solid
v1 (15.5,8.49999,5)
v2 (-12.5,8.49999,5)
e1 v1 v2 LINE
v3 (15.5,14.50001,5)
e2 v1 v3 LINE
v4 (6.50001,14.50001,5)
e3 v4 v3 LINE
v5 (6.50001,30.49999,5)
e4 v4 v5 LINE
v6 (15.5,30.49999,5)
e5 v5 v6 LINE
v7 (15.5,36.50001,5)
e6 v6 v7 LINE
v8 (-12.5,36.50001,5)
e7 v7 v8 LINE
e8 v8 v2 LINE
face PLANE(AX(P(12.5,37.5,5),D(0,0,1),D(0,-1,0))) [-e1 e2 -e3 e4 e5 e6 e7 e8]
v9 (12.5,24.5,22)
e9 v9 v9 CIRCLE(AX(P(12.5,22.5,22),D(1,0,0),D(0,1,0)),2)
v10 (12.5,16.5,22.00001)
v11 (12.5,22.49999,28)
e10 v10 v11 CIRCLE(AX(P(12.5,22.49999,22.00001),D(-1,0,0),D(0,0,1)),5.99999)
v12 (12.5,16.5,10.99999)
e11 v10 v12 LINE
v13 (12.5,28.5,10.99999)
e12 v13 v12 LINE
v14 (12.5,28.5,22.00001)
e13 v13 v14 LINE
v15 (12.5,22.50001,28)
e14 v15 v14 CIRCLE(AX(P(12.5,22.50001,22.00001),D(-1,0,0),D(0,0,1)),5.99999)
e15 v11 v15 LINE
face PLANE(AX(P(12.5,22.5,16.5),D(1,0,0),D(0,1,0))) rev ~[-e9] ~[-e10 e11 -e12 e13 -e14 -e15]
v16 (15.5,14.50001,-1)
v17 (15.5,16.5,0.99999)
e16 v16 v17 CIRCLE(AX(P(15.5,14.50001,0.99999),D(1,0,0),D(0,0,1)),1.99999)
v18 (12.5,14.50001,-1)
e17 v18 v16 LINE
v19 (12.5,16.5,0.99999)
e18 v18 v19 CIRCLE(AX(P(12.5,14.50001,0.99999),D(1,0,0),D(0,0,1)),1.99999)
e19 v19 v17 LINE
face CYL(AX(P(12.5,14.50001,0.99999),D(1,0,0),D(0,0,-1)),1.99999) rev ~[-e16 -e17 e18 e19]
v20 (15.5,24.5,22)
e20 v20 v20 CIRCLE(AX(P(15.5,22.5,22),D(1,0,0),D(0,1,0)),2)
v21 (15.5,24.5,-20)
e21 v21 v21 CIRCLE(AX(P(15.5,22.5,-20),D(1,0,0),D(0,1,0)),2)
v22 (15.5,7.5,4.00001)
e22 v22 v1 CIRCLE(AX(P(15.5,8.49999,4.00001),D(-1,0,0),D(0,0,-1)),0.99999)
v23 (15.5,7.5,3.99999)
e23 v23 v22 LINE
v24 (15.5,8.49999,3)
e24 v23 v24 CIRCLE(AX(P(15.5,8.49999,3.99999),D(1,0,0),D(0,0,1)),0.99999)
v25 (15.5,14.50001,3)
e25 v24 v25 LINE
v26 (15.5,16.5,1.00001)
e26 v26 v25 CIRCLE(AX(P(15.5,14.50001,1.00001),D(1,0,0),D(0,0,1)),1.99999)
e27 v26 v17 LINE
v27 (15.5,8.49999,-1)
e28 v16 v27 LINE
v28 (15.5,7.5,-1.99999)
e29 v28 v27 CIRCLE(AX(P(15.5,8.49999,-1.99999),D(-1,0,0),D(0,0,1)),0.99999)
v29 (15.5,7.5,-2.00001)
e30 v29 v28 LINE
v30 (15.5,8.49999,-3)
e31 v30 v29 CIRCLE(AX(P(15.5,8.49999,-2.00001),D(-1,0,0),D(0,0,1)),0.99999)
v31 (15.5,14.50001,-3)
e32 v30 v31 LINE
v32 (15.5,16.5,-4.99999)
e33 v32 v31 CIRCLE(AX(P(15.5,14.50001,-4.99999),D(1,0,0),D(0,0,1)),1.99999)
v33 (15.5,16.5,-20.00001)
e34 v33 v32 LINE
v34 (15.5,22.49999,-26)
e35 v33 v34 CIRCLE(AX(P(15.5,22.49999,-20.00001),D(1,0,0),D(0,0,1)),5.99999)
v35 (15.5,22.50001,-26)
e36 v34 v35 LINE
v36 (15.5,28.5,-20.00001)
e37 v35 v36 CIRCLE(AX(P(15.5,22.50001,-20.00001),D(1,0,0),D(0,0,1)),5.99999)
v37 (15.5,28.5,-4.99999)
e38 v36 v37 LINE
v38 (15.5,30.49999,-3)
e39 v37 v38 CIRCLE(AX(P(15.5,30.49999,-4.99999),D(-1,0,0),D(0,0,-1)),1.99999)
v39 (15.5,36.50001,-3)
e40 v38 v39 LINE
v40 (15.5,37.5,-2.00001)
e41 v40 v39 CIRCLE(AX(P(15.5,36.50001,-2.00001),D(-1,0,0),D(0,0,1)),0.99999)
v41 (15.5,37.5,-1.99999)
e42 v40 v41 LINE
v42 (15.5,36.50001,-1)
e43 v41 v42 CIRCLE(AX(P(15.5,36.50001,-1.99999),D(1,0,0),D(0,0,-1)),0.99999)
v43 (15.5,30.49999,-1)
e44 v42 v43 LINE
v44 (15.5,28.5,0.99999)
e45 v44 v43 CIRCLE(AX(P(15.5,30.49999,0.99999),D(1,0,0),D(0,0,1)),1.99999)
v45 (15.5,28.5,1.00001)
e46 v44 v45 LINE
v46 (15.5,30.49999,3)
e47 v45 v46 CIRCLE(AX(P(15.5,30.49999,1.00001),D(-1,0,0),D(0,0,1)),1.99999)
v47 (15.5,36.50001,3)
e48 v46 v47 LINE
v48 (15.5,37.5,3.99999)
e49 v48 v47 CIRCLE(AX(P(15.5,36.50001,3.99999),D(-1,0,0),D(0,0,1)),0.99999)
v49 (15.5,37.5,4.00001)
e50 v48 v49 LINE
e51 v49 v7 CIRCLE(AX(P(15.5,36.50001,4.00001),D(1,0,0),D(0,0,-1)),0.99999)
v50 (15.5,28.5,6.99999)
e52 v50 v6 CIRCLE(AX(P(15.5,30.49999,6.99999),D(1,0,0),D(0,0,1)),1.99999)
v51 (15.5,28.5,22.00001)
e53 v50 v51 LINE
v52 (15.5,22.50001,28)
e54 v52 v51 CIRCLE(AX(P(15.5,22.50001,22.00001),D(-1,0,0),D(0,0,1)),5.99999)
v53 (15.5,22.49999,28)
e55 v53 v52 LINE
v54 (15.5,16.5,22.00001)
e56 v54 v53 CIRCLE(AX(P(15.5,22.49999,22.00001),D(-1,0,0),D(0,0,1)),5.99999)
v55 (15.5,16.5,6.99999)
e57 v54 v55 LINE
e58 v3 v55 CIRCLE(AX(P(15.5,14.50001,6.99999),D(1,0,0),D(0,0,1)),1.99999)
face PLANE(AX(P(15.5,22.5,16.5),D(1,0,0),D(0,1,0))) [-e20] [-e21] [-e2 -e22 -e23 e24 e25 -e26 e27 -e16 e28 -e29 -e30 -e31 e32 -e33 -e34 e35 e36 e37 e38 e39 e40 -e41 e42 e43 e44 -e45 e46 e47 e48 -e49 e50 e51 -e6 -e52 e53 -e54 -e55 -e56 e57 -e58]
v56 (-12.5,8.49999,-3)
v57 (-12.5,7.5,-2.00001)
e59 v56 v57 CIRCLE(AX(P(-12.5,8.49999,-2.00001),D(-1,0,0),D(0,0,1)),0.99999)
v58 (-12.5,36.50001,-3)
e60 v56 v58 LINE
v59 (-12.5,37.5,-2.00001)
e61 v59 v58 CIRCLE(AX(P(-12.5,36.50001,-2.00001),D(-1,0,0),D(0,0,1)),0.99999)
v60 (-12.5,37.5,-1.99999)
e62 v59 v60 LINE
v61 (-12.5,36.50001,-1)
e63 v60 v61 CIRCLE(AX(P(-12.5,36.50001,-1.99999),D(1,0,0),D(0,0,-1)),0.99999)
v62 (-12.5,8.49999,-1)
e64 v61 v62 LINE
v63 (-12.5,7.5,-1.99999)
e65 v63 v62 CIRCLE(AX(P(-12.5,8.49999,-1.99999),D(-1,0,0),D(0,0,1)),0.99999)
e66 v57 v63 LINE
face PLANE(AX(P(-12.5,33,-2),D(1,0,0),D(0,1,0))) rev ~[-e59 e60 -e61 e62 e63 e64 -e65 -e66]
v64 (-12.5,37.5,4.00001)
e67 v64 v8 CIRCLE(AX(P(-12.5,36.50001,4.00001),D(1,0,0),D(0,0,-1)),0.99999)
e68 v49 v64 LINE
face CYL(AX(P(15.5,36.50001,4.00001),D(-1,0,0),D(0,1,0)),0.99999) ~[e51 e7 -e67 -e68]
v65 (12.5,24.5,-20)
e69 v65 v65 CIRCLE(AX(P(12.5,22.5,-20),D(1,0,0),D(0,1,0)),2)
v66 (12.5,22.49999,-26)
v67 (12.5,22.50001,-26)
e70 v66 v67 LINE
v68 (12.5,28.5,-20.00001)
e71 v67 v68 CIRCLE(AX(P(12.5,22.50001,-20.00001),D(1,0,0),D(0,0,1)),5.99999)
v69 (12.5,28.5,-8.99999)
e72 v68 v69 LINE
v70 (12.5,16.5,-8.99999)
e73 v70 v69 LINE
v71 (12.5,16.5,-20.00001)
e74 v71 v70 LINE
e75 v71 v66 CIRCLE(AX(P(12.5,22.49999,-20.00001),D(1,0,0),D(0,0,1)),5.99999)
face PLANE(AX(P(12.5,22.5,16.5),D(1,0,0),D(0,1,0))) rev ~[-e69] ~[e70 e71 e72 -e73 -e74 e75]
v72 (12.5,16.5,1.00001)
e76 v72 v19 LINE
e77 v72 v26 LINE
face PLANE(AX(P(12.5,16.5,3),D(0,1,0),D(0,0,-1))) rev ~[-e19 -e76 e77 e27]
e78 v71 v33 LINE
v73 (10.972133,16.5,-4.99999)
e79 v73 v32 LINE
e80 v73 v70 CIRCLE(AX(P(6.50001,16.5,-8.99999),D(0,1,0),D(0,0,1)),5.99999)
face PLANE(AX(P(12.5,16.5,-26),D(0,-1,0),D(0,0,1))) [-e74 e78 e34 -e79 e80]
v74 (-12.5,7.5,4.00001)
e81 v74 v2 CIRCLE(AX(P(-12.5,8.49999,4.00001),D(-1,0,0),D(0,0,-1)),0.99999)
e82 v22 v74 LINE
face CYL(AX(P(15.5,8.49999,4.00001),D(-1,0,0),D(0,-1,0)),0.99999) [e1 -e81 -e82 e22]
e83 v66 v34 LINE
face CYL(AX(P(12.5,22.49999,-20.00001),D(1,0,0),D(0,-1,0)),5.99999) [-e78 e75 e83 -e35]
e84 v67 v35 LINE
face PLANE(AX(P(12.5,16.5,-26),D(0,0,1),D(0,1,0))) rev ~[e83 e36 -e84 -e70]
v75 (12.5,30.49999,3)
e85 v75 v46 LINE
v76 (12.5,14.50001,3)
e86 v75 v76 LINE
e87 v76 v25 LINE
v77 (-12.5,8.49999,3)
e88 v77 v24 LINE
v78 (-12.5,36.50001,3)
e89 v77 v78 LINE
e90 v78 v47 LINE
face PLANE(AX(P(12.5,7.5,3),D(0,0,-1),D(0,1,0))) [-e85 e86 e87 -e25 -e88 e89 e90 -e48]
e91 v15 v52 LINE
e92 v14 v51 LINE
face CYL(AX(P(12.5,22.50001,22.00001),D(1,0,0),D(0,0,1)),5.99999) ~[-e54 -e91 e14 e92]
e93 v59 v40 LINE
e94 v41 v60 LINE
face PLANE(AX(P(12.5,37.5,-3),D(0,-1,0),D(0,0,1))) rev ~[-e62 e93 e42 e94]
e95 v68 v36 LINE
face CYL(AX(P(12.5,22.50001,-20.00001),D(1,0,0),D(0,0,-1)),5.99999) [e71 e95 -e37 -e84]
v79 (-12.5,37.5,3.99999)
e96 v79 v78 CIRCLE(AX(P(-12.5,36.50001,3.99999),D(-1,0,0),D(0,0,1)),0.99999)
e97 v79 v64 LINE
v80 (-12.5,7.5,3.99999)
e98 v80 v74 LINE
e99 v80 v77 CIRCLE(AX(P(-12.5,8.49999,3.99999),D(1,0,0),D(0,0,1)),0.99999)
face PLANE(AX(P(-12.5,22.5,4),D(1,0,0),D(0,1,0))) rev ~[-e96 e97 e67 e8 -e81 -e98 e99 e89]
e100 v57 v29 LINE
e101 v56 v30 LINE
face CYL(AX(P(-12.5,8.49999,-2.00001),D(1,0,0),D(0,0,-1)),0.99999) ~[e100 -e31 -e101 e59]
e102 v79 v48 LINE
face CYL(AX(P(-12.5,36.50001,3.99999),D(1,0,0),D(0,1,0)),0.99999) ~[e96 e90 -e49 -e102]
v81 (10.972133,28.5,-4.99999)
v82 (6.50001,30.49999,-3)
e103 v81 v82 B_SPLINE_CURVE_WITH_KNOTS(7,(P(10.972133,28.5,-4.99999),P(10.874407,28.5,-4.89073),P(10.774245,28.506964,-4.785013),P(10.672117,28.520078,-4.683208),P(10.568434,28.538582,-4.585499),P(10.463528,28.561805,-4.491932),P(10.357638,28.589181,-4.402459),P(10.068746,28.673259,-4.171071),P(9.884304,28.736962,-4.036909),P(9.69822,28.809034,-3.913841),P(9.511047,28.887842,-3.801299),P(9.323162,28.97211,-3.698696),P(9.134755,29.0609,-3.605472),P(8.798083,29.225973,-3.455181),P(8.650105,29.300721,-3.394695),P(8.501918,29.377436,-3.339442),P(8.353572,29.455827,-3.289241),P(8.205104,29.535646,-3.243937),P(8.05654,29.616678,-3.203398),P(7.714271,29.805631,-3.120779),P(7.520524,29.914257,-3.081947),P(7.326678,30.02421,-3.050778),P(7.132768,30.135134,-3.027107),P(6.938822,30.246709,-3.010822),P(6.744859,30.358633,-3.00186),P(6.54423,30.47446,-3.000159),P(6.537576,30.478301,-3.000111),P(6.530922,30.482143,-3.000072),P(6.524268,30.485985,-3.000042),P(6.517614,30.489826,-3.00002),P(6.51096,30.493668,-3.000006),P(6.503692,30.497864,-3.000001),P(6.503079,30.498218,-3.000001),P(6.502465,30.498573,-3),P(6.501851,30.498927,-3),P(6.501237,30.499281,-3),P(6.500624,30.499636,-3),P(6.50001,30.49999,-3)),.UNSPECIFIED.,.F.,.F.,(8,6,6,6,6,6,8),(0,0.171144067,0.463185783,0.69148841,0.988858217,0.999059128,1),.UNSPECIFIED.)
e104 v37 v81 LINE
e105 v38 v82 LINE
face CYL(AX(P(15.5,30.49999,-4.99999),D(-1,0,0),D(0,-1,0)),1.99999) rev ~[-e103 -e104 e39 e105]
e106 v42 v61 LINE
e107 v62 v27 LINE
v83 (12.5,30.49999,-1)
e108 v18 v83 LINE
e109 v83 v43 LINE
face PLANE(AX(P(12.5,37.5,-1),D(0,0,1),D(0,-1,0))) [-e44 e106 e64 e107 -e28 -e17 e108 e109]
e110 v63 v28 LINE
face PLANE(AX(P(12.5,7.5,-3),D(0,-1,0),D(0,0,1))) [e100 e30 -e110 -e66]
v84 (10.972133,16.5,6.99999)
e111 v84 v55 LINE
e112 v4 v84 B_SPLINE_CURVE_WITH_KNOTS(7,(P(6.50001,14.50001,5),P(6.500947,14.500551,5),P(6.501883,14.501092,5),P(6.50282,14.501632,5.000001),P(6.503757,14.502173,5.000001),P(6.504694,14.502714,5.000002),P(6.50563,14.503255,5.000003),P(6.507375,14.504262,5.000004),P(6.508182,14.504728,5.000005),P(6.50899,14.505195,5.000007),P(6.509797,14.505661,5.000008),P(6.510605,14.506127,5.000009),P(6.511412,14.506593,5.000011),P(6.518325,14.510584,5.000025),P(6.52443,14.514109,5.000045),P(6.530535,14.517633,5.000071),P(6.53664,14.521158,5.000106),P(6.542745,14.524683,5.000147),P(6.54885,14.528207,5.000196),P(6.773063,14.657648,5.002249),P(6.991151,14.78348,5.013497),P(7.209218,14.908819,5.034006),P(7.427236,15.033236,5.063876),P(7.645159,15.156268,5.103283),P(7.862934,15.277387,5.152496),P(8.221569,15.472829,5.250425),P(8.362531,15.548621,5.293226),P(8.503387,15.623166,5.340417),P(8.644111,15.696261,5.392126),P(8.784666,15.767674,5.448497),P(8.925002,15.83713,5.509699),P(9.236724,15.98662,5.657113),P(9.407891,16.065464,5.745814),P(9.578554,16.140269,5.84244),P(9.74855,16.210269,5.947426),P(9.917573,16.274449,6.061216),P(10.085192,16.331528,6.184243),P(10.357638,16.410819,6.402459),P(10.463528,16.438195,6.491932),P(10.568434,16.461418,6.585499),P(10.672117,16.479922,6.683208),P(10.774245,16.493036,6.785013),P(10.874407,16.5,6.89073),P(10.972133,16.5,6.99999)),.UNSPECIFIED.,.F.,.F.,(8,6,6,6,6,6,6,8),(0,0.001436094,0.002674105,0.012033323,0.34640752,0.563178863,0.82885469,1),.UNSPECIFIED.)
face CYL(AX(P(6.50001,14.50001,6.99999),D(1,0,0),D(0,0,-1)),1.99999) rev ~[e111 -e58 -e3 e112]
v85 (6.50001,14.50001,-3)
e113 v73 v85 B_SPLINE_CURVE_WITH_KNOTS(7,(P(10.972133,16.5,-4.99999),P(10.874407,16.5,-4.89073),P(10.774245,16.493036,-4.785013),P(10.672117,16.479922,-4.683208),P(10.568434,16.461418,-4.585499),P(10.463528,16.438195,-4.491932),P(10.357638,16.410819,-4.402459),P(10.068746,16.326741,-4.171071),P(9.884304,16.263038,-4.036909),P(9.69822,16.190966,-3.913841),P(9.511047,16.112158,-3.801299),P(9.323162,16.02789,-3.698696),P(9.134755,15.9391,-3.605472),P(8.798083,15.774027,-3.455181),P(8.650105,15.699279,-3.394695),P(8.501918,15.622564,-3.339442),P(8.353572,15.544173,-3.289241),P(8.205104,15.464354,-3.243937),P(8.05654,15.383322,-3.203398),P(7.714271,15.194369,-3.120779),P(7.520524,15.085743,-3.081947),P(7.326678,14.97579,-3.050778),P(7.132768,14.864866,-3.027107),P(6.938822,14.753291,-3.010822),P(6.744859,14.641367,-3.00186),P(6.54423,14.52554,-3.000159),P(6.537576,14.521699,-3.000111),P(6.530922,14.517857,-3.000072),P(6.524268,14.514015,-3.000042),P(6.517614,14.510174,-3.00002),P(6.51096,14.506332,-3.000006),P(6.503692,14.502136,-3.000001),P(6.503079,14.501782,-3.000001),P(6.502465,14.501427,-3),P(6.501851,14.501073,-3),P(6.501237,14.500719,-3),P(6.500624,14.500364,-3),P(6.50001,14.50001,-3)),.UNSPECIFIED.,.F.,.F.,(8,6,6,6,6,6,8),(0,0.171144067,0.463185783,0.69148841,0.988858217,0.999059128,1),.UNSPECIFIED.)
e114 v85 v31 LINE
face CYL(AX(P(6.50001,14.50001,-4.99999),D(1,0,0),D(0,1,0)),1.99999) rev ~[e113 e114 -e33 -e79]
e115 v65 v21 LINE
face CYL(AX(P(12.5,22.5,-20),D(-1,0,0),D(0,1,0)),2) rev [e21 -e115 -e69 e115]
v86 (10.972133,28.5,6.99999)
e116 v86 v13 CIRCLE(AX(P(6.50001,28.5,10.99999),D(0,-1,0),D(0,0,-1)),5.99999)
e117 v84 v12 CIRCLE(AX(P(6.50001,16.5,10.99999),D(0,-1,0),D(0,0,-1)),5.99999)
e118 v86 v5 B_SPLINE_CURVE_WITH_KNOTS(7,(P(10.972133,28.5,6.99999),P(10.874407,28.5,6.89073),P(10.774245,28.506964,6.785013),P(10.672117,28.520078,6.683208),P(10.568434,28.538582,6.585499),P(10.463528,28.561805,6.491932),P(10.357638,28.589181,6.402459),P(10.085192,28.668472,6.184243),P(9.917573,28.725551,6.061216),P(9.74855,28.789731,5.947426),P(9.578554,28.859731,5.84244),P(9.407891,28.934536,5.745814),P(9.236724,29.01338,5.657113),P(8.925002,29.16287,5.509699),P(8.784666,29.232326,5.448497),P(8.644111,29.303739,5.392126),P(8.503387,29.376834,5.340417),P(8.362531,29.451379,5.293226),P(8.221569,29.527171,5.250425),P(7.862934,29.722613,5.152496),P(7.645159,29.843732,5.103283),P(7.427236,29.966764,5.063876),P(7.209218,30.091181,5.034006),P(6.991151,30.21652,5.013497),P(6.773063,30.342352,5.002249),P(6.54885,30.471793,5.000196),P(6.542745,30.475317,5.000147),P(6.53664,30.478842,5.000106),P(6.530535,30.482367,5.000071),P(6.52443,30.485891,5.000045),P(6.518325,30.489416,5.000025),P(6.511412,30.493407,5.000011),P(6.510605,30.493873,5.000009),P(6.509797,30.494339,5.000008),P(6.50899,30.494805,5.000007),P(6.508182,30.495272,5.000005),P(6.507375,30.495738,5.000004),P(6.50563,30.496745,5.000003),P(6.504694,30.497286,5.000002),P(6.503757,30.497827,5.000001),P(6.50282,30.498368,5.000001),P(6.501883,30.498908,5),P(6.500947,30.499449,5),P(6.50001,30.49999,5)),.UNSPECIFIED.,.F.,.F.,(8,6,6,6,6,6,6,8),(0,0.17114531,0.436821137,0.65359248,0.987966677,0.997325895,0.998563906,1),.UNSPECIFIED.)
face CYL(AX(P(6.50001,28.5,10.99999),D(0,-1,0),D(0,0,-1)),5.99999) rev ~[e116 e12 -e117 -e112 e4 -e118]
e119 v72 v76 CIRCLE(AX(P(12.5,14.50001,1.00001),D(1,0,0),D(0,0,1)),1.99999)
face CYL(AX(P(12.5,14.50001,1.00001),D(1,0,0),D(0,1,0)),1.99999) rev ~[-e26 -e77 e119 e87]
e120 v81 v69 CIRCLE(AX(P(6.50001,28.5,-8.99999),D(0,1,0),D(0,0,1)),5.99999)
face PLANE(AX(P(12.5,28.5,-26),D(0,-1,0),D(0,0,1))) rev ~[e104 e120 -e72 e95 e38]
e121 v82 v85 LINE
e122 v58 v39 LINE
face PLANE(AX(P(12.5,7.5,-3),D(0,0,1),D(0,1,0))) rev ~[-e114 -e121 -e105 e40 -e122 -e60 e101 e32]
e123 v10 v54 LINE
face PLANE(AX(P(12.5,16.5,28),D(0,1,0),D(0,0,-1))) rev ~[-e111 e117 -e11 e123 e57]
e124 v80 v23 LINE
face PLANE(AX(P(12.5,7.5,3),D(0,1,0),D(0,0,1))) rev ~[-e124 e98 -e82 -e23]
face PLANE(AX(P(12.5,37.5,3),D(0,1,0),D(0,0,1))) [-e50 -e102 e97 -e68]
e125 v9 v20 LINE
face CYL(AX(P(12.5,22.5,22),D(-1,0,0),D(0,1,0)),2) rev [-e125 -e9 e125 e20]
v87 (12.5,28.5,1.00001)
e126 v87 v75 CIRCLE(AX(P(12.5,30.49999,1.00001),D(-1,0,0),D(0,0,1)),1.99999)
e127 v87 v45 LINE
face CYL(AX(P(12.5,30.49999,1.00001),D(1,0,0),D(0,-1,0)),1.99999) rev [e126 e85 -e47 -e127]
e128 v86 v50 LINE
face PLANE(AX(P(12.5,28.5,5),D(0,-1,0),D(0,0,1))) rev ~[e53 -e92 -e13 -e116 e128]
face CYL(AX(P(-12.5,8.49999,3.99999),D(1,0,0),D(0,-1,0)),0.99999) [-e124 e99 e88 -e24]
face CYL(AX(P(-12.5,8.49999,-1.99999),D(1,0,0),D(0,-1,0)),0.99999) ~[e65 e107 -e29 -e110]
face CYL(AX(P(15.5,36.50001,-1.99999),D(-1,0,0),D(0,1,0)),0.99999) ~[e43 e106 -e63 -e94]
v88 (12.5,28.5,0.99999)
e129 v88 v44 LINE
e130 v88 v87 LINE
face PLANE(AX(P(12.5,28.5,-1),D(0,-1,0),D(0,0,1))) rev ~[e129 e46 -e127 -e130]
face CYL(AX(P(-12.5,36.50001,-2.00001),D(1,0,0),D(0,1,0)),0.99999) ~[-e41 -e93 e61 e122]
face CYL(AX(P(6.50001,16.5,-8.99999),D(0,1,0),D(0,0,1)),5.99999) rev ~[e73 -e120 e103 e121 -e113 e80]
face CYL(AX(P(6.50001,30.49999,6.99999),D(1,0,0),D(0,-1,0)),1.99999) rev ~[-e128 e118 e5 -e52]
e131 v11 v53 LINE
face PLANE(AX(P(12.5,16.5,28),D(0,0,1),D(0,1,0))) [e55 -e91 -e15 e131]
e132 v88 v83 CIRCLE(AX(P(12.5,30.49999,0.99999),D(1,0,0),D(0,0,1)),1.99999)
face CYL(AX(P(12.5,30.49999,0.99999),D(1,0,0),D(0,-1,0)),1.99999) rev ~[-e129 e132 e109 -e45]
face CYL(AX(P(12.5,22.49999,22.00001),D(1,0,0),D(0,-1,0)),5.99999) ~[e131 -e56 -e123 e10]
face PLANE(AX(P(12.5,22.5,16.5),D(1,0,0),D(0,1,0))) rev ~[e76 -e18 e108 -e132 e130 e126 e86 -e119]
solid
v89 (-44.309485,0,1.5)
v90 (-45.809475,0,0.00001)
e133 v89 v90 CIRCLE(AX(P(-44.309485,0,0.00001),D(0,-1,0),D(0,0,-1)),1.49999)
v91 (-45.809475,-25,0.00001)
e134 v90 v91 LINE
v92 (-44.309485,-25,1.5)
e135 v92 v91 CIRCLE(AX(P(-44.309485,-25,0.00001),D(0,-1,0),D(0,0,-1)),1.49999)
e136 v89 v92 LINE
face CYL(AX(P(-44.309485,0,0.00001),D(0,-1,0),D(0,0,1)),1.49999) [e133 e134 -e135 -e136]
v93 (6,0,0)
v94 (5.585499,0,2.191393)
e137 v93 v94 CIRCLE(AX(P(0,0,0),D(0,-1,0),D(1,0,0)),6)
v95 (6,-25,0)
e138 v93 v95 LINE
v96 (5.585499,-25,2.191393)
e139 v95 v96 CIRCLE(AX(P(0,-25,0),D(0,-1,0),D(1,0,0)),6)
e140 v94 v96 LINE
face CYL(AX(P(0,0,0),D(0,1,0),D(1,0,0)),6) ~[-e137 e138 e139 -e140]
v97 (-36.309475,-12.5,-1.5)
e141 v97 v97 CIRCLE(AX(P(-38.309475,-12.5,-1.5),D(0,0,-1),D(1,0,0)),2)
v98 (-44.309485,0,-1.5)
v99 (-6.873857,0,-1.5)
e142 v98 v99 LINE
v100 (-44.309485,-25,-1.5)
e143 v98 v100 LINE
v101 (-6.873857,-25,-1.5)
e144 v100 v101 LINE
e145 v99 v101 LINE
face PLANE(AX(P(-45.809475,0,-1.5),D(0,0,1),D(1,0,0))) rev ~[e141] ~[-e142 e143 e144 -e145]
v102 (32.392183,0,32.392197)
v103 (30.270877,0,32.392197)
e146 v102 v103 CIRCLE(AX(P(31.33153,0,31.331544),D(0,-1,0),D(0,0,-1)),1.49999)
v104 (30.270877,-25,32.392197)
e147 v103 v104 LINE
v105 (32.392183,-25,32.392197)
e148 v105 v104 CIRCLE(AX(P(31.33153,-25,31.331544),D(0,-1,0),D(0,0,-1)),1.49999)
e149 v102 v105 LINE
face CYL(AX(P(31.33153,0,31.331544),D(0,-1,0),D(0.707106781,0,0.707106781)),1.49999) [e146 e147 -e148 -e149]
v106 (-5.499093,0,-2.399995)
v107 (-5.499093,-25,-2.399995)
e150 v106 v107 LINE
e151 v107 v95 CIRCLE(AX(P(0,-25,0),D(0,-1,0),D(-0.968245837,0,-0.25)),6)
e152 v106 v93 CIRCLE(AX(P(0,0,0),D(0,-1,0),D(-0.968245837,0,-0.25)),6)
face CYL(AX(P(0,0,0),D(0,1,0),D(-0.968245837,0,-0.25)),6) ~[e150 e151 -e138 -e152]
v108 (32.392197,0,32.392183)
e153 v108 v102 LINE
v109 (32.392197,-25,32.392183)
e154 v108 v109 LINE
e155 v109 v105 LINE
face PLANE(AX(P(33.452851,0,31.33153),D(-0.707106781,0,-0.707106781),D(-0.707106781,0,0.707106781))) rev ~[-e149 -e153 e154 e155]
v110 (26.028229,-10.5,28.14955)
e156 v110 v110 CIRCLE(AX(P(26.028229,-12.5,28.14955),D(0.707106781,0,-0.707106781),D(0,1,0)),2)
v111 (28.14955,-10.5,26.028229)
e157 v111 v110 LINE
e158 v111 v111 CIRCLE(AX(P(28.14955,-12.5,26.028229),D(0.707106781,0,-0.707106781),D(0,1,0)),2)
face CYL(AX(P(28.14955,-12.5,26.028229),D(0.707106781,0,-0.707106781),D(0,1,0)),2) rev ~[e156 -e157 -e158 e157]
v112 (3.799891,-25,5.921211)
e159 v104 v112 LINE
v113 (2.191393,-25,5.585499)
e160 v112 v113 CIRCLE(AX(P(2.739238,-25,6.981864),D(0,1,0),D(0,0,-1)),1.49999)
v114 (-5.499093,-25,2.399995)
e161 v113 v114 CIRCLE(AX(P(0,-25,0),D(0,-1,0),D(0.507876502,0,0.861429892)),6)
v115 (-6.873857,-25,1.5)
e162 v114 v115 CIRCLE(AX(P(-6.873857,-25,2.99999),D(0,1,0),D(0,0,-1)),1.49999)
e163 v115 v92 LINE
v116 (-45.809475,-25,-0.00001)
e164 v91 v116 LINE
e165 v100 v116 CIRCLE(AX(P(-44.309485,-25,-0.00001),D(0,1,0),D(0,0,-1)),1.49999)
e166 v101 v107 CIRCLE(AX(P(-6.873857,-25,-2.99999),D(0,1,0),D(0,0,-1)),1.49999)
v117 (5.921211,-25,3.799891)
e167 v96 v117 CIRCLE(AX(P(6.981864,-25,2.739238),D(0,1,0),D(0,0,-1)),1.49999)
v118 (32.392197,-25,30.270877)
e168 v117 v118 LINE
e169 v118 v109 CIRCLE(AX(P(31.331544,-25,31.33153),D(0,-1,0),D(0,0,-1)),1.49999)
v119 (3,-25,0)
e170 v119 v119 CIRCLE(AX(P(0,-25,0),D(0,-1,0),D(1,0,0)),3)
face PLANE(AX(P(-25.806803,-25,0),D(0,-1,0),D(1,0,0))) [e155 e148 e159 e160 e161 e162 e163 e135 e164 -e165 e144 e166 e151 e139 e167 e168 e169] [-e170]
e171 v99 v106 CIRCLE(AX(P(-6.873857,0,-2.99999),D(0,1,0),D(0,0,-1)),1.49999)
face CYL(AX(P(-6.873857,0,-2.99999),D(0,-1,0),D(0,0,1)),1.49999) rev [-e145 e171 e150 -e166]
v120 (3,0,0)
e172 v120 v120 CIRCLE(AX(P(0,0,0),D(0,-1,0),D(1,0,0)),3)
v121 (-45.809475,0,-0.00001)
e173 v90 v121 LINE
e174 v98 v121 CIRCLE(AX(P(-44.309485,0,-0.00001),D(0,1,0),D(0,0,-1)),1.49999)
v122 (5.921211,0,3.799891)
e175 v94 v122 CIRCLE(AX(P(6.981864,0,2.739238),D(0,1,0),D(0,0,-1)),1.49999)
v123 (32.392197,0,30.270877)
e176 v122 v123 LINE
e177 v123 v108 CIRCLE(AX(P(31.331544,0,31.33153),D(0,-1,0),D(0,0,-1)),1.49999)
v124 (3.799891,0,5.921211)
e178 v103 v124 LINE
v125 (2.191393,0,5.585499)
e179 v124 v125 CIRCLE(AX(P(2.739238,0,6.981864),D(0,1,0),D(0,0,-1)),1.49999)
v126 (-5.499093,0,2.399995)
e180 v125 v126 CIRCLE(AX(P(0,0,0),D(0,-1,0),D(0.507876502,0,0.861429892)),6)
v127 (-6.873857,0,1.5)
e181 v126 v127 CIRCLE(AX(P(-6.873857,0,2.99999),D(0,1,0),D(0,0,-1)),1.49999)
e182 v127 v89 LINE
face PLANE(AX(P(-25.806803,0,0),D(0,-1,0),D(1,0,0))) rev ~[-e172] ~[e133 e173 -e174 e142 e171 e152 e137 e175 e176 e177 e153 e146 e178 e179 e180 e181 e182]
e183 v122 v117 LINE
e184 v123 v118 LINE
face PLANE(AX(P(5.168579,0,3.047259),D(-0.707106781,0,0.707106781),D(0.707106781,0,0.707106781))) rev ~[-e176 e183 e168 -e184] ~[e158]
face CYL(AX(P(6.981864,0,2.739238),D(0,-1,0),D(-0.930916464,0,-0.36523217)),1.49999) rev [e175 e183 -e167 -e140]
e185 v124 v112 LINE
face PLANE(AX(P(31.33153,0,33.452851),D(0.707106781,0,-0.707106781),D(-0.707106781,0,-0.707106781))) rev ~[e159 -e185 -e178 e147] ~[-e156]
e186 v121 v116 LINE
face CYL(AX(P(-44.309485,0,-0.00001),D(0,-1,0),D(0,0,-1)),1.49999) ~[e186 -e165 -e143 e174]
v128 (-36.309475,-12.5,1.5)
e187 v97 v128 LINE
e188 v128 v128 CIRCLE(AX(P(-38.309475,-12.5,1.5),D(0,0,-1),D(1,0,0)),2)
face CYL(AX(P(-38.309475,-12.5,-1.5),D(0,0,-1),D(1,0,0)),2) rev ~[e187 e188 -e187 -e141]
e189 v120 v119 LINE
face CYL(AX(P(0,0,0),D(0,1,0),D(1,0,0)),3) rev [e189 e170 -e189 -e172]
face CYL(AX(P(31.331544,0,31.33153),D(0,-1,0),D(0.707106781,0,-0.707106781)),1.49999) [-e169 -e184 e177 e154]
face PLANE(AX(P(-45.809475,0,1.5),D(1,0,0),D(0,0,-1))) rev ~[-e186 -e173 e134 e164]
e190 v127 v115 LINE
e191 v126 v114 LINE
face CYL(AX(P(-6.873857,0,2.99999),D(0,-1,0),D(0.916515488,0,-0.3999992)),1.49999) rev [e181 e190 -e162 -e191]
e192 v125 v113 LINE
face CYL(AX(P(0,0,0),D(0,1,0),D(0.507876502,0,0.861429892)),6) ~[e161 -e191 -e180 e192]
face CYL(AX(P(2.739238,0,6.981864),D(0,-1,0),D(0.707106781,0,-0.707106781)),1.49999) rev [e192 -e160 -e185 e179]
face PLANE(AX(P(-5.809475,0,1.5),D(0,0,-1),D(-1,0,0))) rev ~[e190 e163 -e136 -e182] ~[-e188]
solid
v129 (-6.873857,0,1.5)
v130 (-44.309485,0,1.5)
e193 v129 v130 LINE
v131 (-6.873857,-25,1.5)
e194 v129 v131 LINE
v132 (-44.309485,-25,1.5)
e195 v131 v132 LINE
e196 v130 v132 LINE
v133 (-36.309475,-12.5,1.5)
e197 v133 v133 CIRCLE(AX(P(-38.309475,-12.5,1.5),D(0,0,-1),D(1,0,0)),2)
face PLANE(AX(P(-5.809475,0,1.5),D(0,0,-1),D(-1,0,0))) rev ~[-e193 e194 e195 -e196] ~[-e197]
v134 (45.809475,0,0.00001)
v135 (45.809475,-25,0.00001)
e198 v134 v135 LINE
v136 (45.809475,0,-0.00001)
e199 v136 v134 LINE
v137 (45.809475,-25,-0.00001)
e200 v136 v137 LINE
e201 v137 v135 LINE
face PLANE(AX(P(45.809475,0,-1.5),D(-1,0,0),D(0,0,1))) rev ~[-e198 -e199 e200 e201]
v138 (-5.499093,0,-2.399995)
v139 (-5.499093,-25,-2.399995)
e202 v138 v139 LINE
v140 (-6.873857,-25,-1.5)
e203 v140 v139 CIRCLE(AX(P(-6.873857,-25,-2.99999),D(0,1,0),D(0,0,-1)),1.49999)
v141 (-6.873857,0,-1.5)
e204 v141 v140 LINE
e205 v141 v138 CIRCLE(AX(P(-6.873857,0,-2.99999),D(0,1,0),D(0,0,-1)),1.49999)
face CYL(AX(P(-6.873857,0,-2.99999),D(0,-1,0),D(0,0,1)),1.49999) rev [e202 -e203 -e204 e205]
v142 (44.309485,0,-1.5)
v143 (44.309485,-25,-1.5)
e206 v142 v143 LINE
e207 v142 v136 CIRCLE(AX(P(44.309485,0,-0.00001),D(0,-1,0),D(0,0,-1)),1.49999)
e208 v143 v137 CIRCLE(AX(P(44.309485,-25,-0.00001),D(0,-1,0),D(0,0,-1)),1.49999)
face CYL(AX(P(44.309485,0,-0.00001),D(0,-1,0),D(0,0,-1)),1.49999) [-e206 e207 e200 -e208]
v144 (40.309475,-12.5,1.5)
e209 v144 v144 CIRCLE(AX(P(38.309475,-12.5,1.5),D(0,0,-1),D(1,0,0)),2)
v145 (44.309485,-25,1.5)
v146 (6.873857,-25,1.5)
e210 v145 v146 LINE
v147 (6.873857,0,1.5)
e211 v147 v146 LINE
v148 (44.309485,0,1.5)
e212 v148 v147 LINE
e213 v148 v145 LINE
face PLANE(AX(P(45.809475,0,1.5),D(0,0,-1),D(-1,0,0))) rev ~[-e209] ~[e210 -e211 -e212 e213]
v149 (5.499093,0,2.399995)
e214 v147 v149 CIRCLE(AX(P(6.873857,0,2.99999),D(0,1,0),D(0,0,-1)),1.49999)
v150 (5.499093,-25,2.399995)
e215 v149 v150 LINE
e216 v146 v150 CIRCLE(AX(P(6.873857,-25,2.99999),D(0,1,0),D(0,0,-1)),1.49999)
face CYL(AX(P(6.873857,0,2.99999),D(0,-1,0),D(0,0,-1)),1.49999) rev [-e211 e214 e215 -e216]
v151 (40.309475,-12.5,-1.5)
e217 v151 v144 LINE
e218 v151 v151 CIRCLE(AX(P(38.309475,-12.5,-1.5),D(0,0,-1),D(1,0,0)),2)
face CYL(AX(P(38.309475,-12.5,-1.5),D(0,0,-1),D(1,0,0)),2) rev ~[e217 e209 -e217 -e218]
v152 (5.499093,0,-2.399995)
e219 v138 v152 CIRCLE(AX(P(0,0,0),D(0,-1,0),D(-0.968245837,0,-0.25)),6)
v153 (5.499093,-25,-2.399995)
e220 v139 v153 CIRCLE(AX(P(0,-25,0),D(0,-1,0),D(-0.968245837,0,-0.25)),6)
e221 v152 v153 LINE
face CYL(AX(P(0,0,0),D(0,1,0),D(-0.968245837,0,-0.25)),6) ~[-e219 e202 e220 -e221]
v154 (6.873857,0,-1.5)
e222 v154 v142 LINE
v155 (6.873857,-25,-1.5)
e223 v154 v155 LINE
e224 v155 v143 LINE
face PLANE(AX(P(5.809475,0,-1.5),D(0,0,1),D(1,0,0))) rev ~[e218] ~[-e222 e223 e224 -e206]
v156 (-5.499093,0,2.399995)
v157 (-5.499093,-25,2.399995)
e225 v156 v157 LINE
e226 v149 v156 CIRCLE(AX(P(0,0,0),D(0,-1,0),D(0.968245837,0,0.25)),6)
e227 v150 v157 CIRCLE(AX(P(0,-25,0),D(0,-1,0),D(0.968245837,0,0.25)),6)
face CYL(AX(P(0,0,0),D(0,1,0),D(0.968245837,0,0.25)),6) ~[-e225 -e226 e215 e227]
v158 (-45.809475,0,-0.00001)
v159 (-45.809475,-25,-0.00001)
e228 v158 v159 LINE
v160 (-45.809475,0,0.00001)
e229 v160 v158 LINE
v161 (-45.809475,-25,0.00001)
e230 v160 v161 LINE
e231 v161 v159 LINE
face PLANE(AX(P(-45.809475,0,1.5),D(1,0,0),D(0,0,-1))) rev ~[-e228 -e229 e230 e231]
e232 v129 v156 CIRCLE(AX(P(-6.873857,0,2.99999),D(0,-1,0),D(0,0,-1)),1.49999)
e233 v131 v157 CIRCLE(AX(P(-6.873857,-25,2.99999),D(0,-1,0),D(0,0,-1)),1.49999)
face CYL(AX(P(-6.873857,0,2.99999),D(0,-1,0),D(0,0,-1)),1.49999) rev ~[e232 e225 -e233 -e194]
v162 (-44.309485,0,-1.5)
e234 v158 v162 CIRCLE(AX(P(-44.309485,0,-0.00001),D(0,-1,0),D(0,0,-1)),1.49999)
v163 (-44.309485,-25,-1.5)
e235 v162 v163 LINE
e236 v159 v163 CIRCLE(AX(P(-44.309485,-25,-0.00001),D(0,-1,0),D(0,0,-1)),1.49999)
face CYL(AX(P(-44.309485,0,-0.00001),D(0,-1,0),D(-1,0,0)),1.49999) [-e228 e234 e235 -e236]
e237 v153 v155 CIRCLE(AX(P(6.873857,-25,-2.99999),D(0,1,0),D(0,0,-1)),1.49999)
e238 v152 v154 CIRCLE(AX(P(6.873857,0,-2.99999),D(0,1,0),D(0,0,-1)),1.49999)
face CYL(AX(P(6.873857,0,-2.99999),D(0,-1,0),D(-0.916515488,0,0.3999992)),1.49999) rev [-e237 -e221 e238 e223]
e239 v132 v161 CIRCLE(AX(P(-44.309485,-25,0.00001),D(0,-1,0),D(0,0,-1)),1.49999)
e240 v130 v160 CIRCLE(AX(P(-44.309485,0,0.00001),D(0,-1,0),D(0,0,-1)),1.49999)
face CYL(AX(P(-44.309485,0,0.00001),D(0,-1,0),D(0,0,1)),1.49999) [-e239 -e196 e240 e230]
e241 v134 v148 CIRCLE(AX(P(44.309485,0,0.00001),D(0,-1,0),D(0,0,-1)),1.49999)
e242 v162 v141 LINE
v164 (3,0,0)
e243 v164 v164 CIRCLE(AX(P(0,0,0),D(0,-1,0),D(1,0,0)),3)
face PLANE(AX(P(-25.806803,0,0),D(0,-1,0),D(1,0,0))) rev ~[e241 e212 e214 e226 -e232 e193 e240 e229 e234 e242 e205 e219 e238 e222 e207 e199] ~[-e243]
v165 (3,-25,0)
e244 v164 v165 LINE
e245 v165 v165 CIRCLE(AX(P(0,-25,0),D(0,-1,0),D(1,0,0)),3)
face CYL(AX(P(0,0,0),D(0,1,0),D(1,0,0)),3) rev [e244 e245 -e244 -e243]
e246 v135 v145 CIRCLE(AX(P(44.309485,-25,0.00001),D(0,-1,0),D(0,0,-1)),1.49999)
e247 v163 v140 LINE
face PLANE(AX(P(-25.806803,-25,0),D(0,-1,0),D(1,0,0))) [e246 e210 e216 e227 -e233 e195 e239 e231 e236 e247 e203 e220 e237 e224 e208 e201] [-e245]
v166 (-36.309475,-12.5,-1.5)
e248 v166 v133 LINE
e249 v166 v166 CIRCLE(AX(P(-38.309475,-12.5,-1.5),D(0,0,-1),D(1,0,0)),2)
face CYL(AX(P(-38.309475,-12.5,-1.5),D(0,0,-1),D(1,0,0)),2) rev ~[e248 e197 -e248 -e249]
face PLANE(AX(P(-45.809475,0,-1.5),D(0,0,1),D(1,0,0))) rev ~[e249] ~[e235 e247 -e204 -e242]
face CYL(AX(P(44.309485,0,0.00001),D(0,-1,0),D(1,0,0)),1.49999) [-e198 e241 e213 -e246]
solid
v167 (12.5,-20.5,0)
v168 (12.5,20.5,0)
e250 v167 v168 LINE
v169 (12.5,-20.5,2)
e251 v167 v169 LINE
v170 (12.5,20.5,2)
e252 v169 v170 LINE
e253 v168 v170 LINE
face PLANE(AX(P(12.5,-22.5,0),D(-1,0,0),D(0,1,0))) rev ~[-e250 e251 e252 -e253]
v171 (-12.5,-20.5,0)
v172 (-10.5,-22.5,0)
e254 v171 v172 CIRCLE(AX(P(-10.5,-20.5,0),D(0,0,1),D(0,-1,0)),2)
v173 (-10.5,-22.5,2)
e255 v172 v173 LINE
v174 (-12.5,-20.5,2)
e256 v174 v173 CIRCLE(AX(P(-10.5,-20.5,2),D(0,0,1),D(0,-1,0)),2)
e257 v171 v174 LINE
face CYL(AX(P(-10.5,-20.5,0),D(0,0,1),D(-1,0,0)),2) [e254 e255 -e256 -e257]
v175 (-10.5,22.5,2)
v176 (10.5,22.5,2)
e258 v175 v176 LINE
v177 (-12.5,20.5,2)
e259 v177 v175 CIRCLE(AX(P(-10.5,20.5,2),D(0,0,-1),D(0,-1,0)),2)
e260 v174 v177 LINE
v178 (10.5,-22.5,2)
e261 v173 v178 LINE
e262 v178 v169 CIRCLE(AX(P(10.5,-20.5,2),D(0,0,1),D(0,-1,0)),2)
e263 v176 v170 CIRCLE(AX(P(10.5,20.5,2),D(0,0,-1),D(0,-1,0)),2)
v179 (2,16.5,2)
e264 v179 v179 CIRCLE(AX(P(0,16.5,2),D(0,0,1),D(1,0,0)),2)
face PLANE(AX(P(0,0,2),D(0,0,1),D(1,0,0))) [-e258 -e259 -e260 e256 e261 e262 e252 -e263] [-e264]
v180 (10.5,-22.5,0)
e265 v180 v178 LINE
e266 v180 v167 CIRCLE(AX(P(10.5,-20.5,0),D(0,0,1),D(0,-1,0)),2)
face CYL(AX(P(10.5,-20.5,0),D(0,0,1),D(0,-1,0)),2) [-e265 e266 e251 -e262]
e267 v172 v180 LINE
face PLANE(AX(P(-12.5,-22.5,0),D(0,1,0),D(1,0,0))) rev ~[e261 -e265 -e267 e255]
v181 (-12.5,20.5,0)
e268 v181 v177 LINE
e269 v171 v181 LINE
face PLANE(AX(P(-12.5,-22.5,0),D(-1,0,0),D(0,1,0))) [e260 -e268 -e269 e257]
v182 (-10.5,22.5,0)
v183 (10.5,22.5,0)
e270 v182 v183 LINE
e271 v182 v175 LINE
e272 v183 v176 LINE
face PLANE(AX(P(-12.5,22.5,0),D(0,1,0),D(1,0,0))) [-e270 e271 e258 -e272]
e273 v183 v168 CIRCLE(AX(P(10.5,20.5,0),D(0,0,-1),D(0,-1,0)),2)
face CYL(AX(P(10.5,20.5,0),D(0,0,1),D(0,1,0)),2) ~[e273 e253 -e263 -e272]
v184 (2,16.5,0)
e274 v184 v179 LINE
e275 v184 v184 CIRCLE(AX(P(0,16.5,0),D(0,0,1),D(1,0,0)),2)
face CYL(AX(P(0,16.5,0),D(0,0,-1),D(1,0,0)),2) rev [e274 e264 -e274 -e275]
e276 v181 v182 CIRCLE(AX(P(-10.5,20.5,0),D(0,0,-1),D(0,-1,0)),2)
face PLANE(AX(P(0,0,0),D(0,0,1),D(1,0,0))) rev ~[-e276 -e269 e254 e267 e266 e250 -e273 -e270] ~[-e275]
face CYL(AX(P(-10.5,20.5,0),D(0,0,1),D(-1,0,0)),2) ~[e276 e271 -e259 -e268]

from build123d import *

# Parameters (mm, degrees)
F0_R      = 3
F1_DEPTH  = 25
F2_R      = 1.49999
F3_R      = 3
F4_DEPTH  = 25
F5_R      = 1.49999
F7_R      = 2
F8_DEPTH  = 3
F6_R      = 2
F9_R      = 2
F10_DEPTH = 3
F11_W     = 25
F11_H     = 45
F11_R     = 2
F12_DEPTH = 2
F13_W     = 12
F13_H     = 23
F13_R     = 2
F13_W_2   = 9
F13_H_2   = 2
F13_W_3   = 6
F14_DEPTH = 3
F15_DEPTH = 25
F16_R     = 0.99999
F17_R     = 5.99999
F18_R     = 1.99999
F19_R     = 2


# Not quite as in the source:
# - a fillet or chamfer is up to 0.001 mm smaller than in the source, because OpenCascade refuses the exact size


with BuildPart() as f1:
    # F0 (on Front) → F1 (new body)
    with BuildSketch(Plane.XZ):
        with BuildLine():
            ThreePointArc((-5.8094750193, -1.5), (-6, 0), (-5.8094750193, 1.5))
            Line((-5.8094750193, 1.5), (-45.8094750193, 1.5))
            Line((-45.8094750193, 1.5), (-45.8094750193, -1.5))
            Line((-45.8094750193, -1.5), (-5.8094750193, -1.5))
        make_face()
        with BuildLine():
            ThreePointArc((5.8094750193, -1.5), (5.9521781776, -0.7560257549), (6, 0))
            ThreePointArc((6, 0), (5.9521781776, 0.7560257549), (5.8094750193, 1.5))
            ThreePointArc((5.8094750193, 1.5), (0, 6), (-5.8094750193, 1.5))
            ThreePointArc((-5.8094750193, 1.5), (-6, 0), (-5.8094750193, -1.5))
            ThreePointArc((-5.8094750193, -1.5), (0, -6), (5.8094750193, -1.5))
        make_face()
        Circle(F0_R, mode=Mode.SUBTRACT)
        with BuildLine():
            ThreePointArc((5.8094750193, 1.5), (5.9521781776, 0.7560257549), (6, 0))
            ThreePointArc((6, 0), (5.9521781776, -0.7560257549), (5.8094750193, -1.5))
            Line((5.8094750193, -1.5), (45.8094750193, -1.5))
            Line((45.8094750193, -1.5), (45.8094750193, 1.5))
            Line((45.8094750193, 1.5), (5.8094750193, 1.5))
        make_face()
    extrude(amount=F1_DEPTH)

    # F2 (radius 1.5 in the source; OpenCascade refuses exactly that, so slightly less here)
    f2_edges = [f1.edges().sort_by_distance(p)[0] for p in [
        (-45.809475, -12.5, 1.5),
        (-45.809475, -12.5, -1.5),
        (45.809475, -12.5, 1.5),
        (45.809475, -12.5, -1.5),
        (-5.809475, -12.5, 1.5),
        (5.809475, -12.5, 1.5),
        (-5.809475, -12.5, -1.5),
        (5.809475, -12.5, -1.5),
    ]]
    fillet(f2_edges, radius=F2_R)


with BuildPart() as f4:
    # F3 (on Front) → F4 (new body)
    with BuildSketch(Plane.XZ):
        with BuildLine():
            Line((-45.8094750193, -1.5), (-5.8094750193, -1.5))
            ThreePointArc((-5.8094750193, -1.5), (-6, 0), (-5.8094750193, 1.5))
            Line((-5.8094750193, 1.5), (-45.8094750193, 1.5))
            Line((-45.8094750193, 1.5), (-45.8094750193, -1.5))
        make_face()
        with BuildLine():
            ThreePointArc((-5.8094750193, -1.5), (0.7560257549, -5.9521781776), (6, 0))
            ThreePointArc((6, 0), (5.788414123, 1.5793232541), (5.1685793531, 3.0472590095))
            ThreePointArc((5.1685793531, 3.0472590095), (4.2426406871, 4.2426406871), (3.0472590095, 5.1685793531))
            ThreePointArc((3.0472590095, 5.1685793531), (-2.2961005942, 5.5432771951), (-5.8094750193, 1.5))
            ThreePointArc((-5.8094750193, 1.5), (-6, 0), (-5.8094750193, -1.5))
        make_face()
        Circle(F3_R, mode=Mode.SUBTRACT)
        with BuildLine():
            ThreePointArc((3.0472590095, 5.1685793531), (4.2426406871, 4.2426406871), (5.1685793531, 3.0472590095))
            Line((5.1685793531, 3.0472590095), (33.4528506005, 31.331530257))
            Line((33.4528506005, 31.331530257), (31.331530257, 33.4528506005))
            Line((31.331530257, 33.4528506005), (3.0472590095, 5.1685793531))
        make_face()
    extrude(amount=F4_DEPTH)

    # F5 (radius 1.5 in the source; OpenCascade refuses exactly that, so slightly less here)
    f5_edges = [f4.edges().sort_by_distance(p)[0] for p in [
        (-45.809475, -12.5, 1.5),
        (-5.809475, -12.5, 1.5),
        (3.047259, -12.5, 5.168579),
        (31.33153, -12.5, 33.452851),
        (33.452851, -12.5, 31.33153),
        (-45.809475, -12.5, -1.5),
        (-5.809475, -12.5, -1.5),
        (5.168579, -12.5, 3.047259),
    ]]
    fillet(f5_edges, radius=F5_R)

    # F7 (on face) → F8 (cut, through all)
    with BuildSketch(Plane(origin=(1.0606601718, 0, -1.0606601718), x_dir=(0, 1, 0), z_dir=(0.7071067812, 0, -0.7071067812))):
        with Locations((-12.5, 38.3094750193)):
            Circle(F7_R)
    extrude(amount=-F8_DEPTH, mode=Mode.SUBTRACT)


with BuildPart() as f10_tool:
    # F6 (on face) + F9 (on face) → F10 (new body, through all)
    with BuildSketch(Plane(origin=(0, 0, -1.5), x_dir=(1, 0, 0), z_dir=(0, 0, -1))):
        with Locations((-38.3094750193, 12.5)):
            Circle(F6_R)
    with BuildSketch(Plane(origin=(0, 0, -1.5), x_dir=(1, 0, 0), z_dir=(0, 0, -1))):
        with Locations((38.3094750193, 12.5)):
            Circle(F9_R)
    extrude(amount=-F10_DEPTH)


with BuildPart() as f1_1:
    add(f1.part)

    # F10: cut by f10_tool
    add(f10_tool.part, mode=Mode.SUBTRACT)


with BuildPart() as f4_1:
    add(f4.part)

    # F10: cut by f10_tool
    add(f10_tool.part, mode=Mode.SUBTRACT)


with BuildPart() as f12:
    # F11 (on Top) → F12 (new body)
    with BuildSketch(Plane.XY):
        Rectangle(F11_W, F11_H)
        with Locations((0, 16.5)):
            Circle(F11_R, mode=Mode.SUBTRACT)
    extrude(amount=F12_DEPTH)

    # F19
    f19_edges = [f12.edges().sort_by_distance(p)[0] for p in [
        (-12.5, -22.5, 1),
        (12.5, -22.5, 1),
        (12.5, 22.5, 1),
        (-12.5, 22.5, 1),
    ]]
    fillet(f19_edges, radius=F19_R)


with BuildPart() as f14:
    # F13 (on face) → F14 (new body)
    with BuildSketch(Plane.YZ.offset(12.5)):
        with Locations((22.5, 16.5)):
            Rectangle(F13_W, F13_H)
        with Locations((22.5, 22)):
            Circle(F13_R, mode=Mode.SUBTRACT)
        with Locations((22.5, -14.5)):
            Rectangle(F13_W, F13_H)
        with Locations((22.5, -20)):
            Circle(F13_R, mode=Mode.SUBTRACT)
        with Locations((33, 4)):
            Rectangle(F13_W_2, F13_H_2)
        with Locations((22.5, 4)):
            Rectangle(F13_W, F13_H_2)
        with Locations((12, 4)):
            Rectangle(F13_W_2, F13_H_2)
        with Locations((12, -2)):
            Rectangle(F13_W_2, F13_H_2)
        with Locations((22.5, -2)):
            Rectangle(F13_W, F13_H_2)
        with Locations((33, -2)):
            Rectangle(F13_W_2, F13_H_2)
        with Locations((19.5, 1)):
            Rectangle(F13_W_3, F13_H_2)
        Polygon((22.5, 2), (22.5, 0), (16.5, 0), (16.5, -1), (28.5, -1), (28.5, 3), (16.5, 3), (16.5, 2), align=None)
    extrude(amount=F14_DEPTH)

    # F13 (on face) → F15 (join, through all)
    with BuildSketch(Plane.YZ.offset(12.5)):
        with Locations((22.5, 4)):
            Rectangle(F13_W, F13_H_2)
        with Locations((12, 4)):
            Rectangle(F13_W_2, F13_H_2)
        with Locations((33, 4)):
            Rectangle(F13_W_2, F13_H_2)
        with Locations((33, -2)):
            Rectangle(F13_W_2, F13_H_2)
        with Locations((22.5, -2)):
            Rectangle(F13_W, F13_H_2)
        with Locations((12, -2)):
            Rectangle(F13_W_2, F13_H_2)
    extrude(amount=-F15_DEPTH)

    # F16 (radius 1 in the source; OpenCascade refuses exactly that, so slightly less here)
    f16_edges = [f14.edges().sort_by_distance(p)[0] for p in [
        (1.5, 7.5, 5),
        (1.5, 7.5, 3),
        (1.5, 37.5, 5),
        (1.5, 37.5, 3),
        (1.5, 37.5, -1),
        (1.5, 37.5, -3),
        (1.5, 7.5, -3),
        (1.5, 7.5, -1),
    ]]
    fillet(f16_edges, radius=F16_R)

    # F17 (radius 6 in the source; OpenCascade refuses exactly that, so slightly less here)
    f17_edges = [f14.edges().sort_by_distance(p)[0] for p in [
        (14, 16.5, -26),
        (14, 28.5, -26),
        (12.5, 22.5, -3),
        (12.5, 22.5, 5),
        (14, 28.5, 28),
        (14, 16.5, 28),
    ]]
    fillet(f17_edges, radius=F17_R)

    # F18 (radius 2 in the source; OpenCascade refuses exactly that, so slightly less here)
    f18_edges = [f14.edges().sort_by_distance(p)[0] for p in [
        (14, 28.5, -3),
        (14, 16.5, -3),
        (14, 28.5, 5),
        (14, 16.5, 5),
        (14, 28.5, 3),
        (14, 28.5, -1),
        (14, 16.5, 3),
        (14, 16.5, -1),
    ]]
    fillet(f18_edges, radius=F18_R)


solid = Compound([f1_1.part, f4_1.part, f12.part, f14.part])
